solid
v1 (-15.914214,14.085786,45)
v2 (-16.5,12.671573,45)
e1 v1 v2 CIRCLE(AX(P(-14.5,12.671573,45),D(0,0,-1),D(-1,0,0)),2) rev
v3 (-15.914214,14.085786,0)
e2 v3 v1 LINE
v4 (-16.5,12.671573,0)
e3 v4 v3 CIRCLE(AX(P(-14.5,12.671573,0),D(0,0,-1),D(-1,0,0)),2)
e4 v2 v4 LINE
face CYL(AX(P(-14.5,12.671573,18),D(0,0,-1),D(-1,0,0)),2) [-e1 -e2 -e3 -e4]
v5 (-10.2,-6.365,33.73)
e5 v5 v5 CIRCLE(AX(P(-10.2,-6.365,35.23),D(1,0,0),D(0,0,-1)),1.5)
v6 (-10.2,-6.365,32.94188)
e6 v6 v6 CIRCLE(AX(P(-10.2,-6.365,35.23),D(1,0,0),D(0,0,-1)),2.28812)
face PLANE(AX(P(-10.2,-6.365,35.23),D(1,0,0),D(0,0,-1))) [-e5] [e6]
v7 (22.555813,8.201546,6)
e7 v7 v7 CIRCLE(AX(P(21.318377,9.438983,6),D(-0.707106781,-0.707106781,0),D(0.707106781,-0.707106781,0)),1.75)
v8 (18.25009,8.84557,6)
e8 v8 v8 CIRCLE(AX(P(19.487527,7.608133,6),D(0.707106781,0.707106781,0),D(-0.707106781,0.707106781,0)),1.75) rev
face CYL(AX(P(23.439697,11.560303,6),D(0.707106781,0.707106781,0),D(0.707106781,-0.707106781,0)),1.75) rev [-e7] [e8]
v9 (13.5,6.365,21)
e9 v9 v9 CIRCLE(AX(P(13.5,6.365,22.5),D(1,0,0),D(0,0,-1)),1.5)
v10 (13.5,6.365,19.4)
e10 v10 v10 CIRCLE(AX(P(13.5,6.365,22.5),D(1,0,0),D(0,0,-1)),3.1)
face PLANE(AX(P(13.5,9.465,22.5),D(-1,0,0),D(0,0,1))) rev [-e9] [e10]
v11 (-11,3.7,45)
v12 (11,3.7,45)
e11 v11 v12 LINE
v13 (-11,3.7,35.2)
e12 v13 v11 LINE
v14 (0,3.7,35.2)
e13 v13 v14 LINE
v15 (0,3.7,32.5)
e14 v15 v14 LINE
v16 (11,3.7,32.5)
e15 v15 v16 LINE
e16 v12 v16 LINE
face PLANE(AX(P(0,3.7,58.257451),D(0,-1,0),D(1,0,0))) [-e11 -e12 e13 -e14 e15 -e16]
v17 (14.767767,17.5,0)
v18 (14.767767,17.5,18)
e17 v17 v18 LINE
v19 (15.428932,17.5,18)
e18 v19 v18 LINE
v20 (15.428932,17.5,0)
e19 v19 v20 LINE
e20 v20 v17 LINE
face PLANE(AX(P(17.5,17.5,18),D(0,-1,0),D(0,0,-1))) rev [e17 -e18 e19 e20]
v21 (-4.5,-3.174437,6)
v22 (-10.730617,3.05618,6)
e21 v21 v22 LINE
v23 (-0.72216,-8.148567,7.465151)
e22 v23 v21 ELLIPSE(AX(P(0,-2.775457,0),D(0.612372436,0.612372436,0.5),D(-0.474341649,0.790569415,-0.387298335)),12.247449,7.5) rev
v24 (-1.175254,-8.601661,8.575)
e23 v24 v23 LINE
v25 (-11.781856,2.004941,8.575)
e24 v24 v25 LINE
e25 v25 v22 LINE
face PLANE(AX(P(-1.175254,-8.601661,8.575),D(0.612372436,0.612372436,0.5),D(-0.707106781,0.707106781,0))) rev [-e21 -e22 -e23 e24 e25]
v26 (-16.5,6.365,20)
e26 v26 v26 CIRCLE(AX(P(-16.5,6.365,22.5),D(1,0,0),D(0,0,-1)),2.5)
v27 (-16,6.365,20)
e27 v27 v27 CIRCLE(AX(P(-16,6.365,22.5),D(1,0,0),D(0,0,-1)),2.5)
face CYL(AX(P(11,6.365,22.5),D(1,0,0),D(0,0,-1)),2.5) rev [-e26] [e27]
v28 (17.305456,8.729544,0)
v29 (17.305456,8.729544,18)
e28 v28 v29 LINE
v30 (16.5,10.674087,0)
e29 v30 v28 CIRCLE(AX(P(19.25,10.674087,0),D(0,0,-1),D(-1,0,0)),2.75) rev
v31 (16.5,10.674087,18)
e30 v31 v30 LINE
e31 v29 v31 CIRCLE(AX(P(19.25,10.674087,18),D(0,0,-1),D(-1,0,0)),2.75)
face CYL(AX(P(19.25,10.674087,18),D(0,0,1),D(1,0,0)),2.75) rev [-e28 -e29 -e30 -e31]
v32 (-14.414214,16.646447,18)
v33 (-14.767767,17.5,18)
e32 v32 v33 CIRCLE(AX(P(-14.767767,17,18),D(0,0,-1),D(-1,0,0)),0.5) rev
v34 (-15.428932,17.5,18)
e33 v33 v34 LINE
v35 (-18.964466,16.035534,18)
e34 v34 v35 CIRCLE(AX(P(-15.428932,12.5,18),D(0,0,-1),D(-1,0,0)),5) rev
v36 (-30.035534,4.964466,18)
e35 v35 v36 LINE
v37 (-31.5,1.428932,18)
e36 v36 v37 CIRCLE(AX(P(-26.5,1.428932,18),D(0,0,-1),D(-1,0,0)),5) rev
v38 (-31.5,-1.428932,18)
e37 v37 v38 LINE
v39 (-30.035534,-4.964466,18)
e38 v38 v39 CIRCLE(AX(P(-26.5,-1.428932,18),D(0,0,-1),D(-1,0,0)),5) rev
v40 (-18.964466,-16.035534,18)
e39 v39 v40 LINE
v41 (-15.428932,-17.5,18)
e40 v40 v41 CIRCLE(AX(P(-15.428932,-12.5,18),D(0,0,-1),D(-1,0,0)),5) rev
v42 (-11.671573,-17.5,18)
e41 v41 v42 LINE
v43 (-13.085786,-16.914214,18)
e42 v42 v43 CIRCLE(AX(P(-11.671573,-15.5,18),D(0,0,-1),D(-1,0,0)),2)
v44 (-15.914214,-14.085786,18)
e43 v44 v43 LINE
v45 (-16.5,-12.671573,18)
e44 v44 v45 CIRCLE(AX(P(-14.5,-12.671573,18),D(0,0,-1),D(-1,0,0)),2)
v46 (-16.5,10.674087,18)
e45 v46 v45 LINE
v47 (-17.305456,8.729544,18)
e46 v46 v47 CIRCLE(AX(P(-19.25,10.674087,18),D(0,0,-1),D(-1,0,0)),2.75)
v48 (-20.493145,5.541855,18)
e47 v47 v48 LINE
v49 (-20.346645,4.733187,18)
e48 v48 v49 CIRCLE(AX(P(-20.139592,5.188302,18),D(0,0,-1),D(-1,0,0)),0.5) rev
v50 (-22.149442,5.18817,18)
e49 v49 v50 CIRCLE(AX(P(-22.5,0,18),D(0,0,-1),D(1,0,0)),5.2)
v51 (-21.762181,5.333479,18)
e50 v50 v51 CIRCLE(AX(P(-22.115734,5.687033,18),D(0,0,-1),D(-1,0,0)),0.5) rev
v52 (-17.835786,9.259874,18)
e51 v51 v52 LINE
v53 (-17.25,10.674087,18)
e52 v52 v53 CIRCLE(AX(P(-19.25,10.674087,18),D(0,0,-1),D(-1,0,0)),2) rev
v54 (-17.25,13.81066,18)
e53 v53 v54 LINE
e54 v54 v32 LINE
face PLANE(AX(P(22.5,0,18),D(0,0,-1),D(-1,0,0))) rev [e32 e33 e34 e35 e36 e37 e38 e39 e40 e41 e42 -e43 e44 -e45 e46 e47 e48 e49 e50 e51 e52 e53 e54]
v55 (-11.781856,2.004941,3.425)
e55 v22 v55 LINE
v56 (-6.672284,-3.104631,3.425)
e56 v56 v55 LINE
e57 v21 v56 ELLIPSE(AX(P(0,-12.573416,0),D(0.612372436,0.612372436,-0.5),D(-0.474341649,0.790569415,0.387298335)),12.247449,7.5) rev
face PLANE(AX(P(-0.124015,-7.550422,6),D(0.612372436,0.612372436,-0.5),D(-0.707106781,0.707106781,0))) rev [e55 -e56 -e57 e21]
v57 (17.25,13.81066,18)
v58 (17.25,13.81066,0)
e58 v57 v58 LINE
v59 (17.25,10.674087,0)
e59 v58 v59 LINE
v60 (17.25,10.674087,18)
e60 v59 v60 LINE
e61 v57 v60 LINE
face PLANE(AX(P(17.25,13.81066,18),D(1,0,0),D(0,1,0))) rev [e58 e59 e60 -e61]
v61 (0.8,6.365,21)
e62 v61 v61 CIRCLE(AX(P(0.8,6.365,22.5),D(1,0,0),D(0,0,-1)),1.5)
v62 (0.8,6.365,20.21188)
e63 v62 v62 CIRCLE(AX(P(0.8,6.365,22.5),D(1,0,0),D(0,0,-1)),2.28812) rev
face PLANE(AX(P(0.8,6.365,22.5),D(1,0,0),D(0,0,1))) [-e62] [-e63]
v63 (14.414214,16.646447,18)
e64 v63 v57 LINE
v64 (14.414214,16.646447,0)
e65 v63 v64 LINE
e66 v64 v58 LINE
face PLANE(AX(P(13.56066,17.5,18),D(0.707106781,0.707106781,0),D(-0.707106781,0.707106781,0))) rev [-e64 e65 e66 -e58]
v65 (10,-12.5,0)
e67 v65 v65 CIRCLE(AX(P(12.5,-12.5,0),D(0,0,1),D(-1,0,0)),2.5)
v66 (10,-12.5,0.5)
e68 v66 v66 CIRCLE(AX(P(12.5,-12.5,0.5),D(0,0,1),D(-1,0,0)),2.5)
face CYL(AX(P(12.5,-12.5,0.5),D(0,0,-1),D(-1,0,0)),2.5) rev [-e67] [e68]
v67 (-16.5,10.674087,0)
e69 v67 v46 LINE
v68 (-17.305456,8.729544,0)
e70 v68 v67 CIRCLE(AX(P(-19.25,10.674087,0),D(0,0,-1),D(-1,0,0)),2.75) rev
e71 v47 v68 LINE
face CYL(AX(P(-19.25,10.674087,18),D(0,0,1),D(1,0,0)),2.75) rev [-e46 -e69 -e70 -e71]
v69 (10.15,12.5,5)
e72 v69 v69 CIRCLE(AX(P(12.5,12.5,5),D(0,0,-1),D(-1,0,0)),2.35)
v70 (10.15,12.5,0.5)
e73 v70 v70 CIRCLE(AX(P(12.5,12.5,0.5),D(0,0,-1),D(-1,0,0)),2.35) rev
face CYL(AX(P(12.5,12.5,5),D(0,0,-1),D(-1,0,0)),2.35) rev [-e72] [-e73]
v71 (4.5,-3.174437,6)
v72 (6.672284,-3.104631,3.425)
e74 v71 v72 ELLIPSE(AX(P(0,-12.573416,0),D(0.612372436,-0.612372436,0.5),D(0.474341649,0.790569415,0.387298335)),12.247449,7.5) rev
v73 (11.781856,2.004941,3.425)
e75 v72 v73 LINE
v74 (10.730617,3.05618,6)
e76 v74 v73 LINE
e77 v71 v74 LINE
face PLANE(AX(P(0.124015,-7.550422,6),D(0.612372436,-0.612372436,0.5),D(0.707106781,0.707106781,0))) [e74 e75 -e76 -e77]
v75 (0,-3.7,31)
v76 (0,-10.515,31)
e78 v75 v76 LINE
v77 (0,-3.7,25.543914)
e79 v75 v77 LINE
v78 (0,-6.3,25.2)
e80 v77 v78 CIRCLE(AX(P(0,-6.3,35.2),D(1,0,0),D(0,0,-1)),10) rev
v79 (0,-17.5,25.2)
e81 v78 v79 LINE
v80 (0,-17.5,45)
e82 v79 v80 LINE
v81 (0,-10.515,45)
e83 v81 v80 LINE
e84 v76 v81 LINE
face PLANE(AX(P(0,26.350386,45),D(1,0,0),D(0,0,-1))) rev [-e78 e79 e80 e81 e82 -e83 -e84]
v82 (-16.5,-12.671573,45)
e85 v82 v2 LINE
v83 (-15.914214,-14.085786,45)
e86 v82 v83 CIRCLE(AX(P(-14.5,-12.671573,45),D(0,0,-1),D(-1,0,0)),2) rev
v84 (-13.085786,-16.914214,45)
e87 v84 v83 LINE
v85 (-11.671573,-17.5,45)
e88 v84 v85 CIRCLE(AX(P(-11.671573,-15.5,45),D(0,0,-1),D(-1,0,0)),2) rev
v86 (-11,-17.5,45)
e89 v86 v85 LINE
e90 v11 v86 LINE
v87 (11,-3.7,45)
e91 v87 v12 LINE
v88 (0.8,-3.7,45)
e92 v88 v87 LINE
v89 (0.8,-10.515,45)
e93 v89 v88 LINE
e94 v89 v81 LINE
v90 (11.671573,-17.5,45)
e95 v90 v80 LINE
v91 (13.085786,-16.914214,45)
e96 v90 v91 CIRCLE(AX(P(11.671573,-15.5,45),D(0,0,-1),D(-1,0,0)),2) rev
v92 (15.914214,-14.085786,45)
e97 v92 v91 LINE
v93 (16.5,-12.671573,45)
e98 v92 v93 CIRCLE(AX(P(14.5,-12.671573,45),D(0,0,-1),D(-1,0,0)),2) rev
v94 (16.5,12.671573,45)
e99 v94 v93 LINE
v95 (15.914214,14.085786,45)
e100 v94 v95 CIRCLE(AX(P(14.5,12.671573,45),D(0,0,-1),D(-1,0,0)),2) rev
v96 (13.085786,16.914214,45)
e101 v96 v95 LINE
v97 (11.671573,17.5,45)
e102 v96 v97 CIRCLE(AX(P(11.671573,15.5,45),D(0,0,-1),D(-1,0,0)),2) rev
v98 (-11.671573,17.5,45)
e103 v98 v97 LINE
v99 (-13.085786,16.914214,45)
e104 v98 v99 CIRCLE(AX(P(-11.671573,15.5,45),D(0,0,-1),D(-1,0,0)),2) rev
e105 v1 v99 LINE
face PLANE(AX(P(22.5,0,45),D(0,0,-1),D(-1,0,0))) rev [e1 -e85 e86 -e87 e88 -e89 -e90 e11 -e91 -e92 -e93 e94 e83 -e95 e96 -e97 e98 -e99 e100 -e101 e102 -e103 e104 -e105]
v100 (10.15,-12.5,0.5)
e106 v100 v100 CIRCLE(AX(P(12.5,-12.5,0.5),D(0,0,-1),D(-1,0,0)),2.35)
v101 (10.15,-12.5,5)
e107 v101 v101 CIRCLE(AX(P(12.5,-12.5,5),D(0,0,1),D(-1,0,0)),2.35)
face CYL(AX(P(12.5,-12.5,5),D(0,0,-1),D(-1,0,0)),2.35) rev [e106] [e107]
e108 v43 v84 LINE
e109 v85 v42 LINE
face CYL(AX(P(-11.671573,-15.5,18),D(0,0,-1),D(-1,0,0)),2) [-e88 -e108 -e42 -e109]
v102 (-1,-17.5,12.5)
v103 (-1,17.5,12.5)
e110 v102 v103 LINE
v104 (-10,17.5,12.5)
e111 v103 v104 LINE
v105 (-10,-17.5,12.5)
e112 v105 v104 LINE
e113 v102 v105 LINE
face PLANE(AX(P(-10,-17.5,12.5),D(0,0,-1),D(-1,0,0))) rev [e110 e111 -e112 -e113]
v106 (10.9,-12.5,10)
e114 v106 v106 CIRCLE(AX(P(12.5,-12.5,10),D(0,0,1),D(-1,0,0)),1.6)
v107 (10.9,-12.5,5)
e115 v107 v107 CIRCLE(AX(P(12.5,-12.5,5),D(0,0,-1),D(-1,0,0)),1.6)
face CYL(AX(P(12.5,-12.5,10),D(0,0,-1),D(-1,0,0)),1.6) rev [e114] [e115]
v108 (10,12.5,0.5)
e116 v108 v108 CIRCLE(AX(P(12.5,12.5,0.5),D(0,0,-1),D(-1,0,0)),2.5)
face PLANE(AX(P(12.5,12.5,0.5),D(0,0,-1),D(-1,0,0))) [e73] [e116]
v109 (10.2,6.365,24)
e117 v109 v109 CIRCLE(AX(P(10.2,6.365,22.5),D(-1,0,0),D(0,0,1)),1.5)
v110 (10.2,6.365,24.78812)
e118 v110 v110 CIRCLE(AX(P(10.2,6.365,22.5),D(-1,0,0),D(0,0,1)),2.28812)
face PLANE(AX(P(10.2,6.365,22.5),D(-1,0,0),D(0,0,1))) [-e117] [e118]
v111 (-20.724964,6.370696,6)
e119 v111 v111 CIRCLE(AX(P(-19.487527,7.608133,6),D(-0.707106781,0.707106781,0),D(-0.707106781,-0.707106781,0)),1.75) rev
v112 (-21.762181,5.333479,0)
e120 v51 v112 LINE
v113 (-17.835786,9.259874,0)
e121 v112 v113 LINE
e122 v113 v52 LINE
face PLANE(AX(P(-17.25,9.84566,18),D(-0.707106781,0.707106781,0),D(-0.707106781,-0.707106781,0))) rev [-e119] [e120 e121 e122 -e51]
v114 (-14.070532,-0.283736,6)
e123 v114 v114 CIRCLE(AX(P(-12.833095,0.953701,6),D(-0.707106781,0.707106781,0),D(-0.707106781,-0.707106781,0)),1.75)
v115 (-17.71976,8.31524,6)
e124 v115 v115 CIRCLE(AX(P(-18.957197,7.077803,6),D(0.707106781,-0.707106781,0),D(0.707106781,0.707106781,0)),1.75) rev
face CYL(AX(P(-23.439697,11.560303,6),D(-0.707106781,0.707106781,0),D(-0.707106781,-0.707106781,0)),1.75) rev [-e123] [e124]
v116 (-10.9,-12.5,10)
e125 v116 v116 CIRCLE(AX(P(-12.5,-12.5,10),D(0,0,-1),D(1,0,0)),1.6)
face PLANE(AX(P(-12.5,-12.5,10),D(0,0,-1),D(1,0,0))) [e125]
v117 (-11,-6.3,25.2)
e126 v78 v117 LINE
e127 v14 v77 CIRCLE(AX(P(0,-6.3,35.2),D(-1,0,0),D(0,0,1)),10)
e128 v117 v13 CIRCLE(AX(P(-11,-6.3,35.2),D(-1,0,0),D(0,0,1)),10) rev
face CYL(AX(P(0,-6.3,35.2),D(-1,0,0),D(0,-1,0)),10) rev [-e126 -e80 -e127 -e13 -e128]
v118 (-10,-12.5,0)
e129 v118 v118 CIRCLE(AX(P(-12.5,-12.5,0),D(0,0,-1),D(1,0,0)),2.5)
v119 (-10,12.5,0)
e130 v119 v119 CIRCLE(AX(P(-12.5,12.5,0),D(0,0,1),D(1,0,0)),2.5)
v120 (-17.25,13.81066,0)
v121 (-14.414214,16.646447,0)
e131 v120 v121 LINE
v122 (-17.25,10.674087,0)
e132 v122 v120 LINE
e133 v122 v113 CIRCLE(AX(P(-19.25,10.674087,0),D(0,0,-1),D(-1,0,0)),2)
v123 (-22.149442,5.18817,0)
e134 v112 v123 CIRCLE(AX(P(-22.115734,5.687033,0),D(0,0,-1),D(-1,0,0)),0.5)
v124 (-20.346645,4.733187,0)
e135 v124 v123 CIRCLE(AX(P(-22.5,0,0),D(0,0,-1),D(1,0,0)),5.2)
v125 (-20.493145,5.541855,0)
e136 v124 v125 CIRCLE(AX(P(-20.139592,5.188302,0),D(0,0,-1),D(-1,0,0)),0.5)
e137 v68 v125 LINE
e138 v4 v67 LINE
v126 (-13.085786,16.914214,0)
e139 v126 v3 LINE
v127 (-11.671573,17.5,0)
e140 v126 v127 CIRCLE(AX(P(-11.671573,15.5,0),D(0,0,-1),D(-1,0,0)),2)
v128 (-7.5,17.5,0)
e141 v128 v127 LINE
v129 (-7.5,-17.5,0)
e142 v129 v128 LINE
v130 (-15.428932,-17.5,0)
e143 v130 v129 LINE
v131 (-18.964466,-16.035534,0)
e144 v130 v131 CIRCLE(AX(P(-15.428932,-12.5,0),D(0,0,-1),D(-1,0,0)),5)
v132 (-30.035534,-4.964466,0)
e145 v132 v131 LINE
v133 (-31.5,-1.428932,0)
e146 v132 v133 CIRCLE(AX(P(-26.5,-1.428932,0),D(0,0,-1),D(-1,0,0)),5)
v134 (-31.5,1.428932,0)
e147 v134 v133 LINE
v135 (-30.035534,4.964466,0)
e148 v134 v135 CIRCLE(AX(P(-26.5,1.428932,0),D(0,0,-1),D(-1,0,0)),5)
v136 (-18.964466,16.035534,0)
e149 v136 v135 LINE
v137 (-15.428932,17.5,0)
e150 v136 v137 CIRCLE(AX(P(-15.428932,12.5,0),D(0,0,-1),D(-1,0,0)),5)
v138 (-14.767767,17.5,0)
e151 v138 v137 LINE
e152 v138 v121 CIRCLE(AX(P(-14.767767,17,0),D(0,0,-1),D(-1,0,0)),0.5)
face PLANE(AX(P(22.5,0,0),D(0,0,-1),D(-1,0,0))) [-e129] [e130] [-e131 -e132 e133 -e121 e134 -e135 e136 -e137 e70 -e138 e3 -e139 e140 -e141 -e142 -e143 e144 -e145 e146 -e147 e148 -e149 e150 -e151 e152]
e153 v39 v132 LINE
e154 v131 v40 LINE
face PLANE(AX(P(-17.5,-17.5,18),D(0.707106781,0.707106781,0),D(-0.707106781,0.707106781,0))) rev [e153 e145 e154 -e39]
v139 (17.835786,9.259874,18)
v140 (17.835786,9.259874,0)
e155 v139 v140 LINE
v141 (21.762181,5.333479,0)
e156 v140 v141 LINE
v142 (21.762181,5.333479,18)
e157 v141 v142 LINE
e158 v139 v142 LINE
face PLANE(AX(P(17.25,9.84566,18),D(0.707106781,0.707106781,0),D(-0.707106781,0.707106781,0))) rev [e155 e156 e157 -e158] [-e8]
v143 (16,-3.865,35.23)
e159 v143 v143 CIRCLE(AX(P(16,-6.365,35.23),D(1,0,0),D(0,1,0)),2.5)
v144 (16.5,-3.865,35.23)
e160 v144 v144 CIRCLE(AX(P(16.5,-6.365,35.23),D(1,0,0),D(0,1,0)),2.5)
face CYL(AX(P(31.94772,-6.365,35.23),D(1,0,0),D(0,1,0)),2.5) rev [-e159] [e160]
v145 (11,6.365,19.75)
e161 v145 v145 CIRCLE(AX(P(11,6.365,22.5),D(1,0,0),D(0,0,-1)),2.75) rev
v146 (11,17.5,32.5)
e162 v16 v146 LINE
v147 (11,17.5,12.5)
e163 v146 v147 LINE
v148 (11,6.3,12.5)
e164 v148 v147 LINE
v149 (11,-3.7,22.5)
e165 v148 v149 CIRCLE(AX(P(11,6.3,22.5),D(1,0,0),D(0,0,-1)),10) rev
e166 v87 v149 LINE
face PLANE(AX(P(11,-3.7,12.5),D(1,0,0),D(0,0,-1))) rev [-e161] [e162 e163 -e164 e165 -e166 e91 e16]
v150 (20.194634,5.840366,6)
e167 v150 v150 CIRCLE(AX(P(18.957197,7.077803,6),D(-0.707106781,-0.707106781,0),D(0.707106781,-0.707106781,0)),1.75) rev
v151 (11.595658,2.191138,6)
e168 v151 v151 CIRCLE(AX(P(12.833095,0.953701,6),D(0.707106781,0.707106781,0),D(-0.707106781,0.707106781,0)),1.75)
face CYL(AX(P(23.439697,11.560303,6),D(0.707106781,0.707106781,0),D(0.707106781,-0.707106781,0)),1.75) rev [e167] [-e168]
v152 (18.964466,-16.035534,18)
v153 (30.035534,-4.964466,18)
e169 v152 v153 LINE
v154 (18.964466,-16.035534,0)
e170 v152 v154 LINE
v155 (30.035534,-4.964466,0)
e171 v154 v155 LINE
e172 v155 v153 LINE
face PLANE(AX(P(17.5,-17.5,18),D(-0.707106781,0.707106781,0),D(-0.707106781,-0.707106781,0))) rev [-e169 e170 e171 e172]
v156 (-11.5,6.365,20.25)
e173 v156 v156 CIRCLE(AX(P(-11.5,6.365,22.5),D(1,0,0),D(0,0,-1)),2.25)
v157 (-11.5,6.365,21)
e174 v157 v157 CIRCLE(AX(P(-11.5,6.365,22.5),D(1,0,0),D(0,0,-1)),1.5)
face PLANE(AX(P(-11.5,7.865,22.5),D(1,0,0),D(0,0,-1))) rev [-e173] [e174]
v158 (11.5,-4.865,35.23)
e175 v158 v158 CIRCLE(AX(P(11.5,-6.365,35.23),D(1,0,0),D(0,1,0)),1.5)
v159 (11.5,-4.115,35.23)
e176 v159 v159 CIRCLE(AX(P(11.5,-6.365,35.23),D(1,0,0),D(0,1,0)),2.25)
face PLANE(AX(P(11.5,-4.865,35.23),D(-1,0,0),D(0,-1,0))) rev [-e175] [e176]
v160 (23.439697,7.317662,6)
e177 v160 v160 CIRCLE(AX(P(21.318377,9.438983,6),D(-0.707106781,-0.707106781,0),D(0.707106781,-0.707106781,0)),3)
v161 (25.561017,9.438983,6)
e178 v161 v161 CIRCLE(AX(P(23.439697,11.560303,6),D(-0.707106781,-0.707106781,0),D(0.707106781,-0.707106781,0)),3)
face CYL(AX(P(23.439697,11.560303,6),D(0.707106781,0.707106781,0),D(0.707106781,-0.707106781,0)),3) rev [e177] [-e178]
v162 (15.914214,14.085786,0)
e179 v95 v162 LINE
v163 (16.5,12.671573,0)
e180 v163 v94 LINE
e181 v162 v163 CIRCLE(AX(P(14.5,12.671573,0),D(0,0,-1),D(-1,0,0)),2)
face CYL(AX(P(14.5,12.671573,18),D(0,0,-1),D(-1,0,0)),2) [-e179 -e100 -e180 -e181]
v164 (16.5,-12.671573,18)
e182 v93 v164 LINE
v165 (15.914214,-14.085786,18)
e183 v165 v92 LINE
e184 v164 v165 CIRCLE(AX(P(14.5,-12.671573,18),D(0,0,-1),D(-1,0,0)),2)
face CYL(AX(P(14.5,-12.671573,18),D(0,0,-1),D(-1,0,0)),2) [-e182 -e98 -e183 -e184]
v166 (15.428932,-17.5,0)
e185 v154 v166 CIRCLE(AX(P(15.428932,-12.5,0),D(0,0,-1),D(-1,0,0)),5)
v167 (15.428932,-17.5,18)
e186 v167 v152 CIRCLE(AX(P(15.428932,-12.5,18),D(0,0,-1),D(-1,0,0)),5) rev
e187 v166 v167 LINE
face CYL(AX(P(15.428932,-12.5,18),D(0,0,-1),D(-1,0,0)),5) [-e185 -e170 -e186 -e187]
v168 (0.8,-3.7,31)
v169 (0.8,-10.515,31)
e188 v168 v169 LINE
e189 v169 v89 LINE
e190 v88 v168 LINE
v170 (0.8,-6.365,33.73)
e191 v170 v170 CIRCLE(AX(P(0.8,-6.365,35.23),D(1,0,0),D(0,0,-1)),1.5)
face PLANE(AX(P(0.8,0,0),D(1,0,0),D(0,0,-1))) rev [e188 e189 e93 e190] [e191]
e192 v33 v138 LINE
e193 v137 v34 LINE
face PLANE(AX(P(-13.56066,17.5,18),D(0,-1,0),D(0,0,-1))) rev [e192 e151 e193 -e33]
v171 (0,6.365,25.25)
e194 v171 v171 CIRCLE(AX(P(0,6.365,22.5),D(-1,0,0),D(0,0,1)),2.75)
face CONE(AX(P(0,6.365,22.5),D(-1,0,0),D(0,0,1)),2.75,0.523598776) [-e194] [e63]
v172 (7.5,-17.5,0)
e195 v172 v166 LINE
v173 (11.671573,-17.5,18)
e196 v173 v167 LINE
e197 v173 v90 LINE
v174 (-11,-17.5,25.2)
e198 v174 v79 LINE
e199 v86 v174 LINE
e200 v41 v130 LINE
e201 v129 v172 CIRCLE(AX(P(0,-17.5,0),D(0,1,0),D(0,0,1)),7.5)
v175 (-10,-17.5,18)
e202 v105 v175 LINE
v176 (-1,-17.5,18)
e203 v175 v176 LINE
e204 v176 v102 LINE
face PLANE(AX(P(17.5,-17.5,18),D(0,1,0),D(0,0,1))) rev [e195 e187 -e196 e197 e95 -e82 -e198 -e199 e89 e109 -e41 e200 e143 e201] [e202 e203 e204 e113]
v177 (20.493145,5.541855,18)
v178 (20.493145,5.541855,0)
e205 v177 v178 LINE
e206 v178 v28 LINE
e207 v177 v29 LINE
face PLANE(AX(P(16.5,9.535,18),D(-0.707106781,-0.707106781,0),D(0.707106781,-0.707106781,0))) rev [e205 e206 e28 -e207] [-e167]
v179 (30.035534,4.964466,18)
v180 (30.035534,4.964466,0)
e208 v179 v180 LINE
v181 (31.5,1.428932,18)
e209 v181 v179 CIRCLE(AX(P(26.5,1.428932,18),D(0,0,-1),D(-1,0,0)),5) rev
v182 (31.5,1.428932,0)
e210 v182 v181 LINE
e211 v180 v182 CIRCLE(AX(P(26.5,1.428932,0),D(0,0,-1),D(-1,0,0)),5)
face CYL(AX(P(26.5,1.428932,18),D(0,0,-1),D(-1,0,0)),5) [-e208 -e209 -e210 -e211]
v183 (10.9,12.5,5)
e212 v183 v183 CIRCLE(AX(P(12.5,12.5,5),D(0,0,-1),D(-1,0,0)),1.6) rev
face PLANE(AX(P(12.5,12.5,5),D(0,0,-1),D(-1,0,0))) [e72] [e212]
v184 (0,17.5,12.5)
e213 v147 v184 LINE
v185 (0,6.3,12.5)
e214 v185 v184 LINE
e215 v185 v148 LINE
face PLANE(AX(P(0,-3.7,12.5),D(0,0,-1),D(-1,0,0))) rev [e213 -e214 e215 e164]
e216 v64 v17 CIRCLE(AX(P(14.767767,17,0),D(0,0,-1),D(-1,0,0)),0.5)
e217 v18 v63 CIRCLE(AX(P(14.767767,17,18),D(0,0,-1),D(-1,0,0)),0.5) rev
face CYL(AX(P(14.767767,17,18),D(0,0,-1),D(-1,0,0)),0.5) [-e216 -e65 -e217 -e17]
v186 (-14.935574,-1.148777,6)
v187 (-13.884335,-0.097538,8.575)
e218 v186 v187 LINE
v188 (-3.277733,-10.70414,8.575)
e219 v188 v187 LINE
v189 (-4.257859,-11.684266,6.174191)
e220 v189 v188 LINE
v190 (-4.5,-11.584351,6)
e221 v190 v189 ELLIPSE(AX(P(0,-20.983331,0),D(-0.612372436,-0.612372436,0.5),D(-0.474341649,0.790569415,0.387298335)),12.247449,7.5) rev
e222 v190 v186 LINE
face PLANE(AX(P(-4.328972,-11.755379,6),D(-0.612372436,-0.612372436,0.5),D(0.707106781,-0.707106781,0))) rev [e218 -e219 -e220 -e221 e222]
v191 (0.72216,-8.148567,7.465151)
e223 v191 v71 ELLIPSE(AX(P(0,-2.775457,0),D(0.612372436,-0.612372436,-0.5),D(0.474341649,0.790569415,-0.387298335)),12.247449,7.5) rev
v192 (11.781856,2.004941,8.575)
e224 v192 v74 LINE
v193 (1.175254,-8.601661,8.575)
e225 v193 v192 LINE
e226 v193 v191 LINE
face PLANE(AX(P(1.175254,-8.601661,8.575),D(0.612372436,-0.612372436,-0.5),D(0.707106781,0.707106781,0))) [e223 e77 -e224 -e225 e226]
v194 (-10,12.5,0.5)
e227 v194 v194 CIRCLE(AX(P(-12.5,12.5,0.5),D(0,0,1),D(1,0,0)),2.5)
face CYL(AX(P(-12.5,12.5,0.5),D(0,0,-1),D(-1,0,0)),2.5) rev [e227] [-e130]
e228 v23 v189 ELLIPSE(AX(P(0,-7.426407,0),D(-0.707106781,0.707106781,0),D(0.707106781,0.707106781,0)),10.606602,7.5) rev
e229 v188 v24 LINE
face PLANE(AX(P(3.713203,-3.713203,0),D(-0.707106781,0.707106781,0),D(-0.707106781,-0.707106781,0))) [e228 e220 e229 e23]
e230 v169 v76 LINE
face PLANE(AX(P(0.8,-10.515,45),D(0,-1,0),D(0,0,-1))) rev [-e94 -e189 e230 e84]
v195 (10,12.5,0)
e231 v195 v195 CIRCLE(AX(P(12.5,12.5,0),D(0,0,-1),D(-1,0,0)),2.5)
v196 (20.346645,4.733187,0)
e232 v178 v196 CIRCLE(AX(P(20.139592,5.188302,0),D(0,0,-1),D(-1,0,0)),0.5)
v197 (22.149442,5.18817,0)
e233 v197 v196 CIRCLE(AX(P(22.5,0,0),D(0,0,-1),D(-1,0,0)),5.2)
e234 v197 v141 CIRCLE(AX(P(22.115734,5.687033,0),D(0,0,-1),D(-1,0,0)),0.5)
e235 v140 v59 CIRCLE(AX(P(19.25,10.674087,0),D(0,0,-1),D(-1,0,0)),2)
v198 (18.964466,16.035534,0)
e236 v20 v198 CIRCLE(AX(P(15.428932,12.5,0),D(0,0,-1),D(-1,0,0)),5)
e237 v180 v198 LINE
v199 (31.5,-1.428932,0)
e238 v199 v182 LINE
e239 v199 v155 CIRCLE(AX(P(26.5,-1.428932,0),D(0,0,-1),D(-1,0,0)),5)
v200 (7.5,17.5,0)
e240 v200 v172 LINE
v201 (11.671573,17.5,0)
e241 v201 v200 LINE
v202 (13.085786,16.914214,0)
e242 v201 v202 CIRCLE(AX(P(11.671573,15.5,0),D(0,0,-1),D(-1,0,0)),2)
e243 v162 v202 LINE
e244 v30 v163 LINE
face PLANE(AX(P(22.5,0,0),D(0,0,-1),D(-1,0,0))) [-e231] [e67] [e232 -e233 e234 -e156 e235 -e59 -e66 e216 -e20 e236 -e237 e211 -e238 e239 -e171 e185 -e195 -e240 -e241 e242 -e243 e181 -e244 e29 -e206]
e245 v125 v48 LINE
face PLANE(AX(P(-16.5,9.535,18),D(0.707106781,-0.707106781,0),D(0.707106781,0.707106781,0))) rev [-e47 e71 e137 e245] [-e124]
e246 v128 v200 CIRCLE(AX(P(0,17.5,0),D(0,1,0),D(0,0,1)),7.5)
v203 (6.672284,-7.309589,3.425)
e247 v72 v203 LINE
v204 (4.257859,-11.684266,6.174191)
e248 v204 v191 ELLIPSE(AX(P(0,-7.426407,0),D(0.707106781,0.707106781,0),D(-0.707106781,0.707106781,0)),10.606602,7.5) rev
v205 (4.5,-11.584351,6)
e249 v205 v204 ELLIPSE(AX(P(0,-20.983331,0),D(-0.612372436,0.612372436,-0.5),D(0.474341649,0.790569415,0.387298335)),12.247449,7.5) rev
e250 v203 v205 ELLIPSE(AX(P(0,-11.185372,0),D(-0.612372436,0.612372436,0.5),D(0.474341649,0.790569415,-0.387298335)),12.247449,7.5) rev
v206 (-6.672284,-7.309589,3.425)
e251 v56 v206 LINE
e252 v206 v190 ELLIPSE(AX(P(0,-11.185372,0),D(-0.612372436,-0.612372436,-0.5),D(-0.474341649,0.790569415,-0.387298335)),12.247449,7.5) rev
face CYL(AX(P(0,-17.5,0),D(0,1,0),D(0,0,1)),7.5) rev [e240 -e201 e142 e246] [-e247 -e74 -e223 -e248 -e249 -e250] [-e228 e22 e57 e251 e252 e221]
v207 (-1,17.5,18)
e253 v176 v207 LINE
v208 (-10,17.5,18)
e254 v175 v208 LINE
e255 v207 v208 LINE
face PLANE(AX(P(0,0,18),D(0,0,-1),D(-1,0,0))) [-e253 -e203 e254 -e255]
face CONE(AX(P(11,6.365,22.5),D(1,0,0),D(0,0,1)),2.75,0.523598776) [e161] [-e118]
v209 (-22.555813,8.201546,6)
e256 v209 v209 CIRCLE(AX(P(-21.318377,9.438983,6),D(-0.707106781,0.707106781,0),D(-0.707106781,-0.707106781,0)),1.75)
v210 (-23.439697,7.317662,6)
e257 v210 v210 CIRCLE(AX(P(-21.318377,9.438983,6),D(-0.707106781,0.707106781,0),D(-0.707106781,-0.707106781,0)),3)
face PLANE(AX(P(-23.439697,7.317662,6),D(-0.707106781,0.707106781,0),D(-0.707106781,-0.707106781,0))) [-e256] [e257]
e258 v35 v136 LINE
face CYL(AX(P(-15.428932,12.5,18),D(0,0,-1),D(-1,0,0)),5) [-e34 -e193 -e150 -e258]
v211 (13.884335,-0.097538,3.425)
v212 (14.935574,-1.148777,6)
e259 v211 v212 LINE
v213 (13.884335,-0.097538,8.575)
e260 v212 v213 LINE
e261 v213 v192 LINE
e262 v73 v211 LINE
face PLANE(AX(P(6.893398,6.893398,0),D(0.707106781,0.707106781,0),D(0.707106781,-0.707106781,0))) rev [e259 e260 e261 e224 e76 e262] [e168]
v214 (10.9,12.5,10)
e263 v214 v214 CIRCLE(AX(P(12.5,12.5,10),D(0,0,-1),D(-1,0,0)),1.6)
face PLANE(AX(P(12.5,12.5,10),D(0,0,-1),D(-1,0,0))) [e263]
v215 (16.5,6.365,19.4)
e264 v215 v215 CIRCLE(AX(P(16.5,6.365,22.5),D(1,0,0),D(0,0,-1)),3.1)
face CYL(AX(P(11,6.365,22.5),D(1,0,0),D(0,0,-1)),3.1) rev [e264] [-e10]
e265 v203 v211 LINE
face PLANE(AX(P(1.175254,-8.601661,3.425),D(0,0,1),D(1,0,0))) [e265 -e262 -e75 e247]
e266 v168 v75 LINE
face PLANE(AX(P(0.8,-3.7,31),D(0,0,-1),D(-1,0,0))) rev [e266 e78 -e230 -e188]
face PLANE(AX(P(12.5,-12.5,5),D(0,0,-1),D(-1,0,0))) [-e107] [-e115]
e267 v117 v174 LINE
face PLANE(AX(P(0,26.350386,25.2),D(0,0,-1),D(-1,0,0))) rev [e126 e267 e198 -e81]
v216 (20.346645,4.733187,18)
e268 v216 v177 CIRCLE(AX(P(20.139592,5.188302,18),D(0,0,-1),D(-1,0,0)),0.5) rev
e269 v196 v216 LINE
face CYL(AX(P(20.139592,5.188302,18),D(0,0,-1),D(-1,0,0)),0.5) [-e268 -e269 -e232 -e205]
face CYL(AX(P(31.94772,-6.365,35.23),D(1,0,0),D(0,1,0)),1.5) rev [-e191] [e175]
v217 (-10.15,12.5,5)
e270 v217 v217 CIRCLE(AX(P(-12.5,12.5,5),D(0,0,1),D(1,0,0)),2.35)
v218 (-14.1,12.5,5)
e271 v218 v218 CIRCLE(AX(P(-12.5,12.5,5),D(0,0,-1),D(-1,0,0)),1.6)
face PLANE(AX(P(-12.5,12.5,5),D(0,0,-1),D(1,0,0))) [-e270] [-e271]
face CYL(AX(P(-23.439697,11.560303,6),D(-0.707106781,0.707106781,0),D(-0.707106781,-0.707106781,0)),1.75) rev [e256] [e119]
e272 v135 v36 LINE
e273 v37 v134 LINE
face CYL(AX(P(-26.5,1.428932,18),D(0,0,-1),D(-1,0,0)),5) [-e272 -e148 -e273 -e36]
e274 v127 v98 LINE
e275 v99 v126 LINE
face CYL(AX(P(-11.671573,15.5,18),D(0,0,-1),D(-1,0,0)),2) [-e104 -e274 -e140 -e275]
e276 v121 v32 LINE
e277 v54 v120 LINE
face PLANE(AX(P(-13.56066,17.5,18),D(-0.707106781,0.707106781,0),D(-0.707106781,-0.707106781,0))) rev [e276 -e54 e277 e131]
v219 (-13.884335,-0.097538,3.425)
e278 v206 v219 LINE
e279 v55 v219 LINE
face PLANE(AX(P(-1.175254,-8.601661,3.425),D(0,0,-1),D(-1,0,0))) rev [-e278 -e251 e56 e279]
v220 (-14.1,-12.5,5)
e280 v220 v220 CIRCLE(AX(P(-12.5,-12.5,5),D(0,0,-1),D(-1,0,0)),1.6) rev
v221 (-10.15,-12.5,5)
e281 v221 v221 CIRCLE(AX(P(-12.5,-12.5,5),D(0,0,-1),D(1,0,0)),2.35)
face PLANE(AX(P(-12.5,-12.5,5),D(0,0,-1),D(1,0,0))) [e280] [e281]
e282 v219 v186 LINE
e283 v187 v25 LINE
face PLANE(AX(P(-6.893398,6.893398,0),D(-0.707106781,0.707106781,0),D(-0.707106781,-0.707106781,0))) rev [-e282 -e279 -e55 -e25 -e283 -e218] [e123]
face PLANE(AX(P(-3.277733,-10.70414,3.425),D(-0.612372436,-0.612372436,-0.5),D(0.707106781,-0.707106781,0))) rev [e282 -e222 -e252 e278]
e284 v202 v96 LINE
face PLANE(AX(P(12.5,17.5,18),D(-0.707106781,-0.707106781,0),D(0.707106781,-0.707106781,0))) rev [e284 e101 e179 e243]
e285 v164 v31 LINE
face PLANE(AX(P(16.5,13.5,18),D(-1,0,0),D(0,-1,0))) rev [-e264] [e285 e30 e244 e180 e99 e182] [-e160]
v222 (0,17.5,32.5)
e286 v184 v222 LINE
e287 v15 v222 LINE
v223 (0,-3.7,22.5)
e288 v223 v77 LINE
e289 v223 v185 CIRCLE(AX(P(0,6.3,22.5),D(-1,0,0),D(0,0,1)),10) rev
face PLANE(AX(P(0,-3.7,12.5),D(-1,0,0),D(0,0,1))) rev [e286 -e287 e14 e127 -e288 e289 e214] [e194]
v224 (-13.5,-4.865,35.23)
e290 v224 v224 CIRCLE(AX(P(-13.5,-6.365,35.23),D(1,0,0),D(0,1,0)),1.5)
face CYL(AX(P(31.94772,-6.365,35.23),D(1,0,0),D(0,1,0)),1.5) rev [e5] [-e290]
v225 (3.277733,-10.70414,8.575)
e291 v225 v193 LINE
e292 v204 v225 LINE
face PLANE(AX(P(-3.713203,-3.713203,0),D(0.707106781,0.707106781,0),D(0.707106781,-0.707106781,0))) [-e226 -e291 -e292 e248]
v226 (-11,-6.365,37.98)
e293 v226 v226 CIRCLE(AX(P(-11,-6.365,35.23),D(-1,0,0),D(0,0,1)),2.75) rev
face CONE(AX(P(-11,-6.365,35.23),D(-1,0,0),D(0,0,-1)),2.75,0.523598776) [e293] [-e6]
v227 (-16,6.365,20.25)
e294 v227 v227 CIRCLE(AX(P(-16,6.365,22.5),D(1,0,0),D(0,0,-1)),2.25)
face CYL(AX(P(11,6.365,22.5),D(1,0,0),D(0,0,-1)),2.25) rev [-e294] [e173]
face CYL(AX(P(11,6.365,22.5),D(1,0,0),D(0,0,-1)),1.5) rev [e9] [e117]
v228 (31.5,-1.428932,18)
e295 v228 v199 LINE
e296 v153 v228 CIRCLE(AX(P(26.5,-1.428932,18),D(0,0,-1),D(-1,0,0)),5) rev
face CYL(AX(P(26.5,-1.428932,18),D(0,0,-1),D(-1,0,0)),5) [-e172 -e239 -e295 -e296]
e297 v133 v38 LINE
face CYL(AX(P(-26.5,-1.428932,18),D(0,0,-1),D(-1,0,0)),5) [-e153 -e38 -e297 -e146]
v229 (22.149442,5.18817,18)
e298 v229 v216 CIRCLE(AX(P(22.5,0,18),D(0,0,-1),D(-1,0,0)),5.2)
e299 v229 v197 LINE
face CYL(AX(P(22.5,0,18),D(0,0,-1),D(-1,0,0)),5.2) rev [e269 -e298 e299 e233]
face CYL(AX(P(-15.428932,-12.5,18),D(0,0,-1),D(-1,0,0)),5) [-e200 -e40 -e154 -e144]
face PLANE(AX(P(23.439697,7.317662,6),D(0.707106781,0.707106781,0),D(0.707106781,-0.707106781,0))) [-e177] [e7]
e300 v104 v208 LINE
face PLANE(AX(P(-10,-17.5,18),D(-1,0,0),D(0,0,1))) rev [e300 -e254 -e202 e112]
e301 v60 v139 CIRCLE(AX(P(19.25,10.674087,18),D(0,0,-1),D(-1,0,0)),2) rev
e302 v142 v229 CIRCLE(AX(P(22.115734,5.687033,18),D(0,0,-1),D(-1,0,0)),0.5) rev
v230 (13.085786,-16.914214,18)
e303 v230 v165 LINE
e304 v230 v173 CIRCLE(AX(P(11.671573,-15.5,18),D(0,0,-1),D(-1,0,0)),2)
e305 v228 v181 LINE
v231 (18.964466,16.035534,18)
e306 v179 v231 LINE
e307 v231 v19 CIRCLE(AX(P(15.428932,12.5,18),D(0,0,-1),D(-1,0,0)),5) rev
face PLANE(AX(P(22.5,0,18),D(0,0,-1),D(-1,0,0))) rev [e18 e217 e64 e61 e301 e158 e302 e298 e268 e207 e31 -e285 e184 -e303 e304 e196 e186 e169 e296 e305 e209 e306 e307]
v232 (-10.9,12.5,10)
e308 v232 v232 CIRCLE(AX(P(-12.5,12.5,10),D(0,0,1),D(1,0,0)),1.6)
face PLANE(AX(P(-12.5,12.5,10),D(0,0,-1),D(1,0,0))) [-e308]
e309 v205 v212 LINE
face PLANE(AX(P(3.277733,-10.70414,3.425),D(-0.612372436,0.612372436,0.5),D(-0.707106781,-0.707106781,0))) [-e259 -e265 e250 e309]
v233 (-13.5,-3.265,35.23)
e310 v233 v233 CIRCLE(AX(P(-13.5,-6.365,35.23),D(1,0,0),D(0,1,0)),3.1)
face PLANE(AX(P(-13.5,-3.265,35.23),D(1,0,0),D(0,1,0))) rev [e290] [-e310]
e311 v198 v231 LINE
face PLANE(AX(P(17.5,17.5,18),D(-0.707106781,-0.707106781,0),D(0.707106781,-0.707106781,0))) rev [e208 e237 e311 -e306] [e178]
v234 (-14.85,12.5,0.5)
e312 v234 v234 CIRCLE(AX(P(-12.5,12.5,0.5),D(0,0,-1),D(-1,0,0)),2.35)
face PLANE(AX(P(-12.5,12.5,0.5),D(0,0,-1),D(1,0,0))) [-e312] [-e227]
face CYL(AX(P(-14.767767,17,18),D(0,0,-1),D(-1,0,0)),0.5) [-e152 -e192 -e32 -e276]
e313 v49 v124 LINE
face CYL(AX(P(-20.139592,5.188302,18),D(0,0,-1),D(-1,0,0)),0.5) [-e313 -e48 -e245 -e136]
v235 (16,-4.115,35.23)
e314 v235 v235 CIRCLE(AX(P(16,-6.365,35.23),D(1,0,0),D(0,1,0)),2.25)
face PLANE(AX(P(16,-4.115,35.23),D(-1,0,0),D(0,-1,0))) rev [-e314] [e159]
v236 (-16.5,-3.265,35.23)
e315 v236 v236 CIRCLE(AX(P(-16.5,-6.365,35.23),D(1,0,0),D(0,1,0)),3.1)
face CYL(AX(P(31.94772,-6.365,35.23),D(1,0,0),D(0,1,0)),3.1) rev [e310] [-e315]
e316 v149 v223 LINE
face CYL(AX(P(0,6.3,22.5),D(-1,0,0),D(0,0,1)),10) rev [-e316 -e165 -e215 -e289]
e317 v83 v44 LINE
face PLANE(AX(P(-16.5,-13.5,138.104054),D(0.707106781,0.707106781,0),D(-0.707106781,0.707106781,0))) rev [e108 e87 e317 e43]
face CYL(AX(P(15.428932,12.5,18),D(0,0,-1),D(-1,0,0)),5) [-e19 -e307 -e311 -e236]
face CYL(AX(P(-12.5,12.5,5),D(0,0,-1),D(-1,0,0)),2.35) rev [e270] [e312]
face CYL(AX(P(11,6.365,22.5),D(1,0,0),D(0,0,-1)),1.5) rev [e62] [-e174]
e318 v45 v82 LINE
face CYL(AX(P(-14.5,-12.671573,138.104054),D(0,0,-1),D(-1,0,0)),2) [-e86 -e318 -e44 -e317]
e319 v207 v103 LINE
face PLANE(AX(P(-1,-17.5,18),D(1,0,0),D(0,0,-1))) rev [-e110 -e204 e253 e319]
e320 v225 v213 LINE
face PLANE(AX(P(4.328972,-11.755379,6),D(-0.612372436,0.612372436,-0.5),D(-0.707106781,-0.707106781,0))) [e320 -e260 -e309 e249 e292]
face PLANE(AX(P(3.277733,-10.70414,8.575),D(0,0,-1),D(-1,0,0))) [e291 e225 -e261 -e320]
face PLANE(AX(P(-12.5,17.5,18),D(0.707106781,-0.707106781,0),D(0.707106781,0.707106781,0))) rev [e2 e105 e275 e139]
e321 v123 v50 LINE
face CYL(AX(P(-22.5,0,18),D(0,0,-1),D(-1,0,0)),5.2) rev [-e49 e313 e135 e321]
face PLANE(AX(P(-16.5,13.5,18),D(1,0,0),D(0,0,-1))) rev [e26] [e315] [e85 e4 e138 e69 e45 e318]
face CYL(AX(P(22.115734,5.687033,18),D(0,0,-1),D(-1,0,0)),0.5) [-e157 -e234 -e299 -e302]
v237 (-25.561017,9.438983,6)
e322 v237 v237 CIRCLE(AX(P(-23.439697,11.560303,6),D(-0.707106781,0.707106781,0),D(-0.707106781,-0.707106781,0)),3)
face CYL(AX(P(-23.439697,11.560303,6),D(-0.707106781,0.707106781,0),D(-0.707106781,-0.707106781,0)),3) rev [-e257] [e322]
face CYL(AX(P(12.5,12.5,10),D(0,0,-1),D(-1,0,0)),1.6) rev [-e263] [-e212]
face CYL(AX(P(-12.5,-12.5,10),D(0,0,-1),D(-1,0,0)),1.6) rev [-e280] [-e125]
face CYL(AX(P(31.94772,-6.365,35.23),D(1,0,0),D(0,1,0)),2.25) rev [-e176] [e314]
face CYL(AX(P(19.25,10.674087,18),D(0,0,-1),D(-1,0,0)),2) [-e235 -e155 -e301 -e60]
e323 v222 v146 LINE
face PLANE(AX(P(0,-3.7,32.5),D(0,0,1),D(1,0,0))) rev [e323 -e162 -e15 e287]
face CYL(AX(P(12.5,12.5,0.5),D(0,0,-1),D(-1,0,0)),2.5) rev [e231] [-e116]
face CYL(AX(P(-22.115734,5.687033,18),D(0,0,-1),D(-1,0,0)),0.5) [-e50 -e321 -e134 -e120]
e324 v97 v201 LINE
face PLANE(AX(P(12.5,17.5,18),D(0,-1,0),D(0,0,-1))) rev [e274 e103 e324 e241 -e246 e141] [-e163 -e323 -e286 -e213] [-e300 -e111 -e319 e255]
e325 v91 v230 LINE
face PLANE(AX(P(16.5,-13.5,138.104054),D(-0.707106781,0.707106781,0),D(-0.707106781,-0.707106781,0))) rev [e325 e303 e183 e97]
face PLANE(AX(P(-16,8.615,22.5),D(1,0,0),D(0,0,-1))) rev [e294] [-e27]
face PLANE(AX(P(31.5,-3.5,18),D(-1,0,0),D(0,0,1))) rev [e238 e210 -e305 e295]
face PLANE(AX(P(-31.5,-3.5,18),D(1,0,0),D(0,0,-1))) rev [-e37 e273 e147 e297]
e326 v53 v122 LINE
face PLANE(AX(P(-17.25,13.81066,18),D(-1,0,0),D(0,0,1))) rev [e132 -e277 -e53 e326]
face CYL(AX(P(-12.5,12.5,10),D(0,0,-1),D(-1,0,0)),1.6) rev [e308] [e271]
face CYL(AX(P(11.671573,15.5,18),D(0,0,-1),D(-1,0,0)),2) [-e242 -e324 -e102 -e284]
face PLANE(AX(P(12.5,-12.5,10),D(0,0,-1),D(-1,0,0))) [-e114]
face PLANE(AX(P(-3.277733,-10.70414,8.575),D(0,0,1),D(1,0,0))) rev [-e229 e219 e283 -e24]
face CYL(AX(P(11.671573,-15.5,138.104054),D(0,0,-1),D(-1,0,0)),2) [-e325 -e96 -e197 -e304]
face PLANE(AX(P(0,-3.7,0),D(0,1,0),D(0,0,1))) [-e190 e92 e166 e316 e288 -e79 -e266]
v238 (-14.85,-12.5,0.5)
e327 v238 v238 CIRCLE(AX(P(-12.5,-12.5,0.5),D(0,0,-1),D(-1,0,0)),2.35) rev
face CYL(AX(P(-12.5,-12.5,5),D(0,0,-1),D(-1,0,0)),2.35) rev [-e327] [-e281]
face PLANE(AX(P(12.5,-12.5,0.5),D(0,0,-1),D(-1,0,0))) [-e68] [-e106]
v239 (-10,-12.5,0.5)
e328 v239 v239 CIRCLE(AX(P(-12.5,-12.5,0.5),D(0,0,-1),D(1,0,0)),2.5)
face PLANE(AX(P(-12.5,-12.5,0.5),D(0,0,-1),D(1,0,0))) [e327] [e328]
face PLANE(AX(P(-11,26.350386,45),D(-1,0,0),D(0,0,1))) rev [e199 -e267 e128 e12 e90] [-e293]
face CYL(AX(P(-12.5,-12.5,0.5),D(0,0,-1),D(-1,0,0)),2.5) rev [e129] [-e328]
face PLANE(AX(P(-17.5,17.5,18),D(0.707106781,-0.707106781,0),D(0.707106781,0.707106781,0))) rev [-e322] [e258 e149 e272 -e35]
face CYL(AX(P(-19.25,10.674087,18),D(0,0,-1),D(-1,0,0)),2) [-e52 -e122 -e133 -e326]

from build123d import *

# Parameters (mm, degrees)
BOSS_EXTRUDE1_DEPTH     = 18
SKETCH2_R               = 7.5
SKETCH2_W               = 9
SKETCH2_H               = 5.5
CUT_EXTRUDE1_DEPTH      = 51.410812332
FILLET1_R               = 5
FILLET2_R               = 0.5
FILLET3_R               = 2
FILLET4_R               = 2.75
CUT_EXTRUDE2_DEPTH      = 15
SKETCH7_R               = 1.6
CUT_EXTRUDE3_DEPTH      = 10
SKETCH8_R               = 2.35
CUT_EXTRUDE4_DEPTH      = 5
SKETCH9_R               = 2.5
CUT_EXTRUDE5_DEPTH      = 0.5
MIRROR3_COPY_1_SKETCH_R = 1.6
MIRROR3_COPY_1_DEPTH    = 10
MIRROR3_COPY_2_SKETCH_R = 2.35
MIRROR3_COPY_2_DEPTH    = 5
MIRROR3_COPY_3_SKETCH_R = 2.5
MIRROR3_COPY_3_DEPTH    = 0.5
BOSS_EXTRUDE2_DEPTH     = 27
SKETCH11_W              = 11
SKETCH11_H              = 20
CUT_EXTRUDE6_DEPTH      = 21.2
SKETCH12_W              = 11
SKETCH12_H              = 3.7
CUT_EXTRUDE7_DEPTH      = 12.5
FILLET5_R               = 10
CUT_EXTRUDE8_REACH      = 67.133
SKETCH13_W              = 11
SKETCH13_H              = 19.8
FILLET6_R               = 10
SKETCH14_W              = 11
SKETCH14_H              = 7.4
CUT_EXTRUDE9_DEPTH      = 12.5
SKETCH15_R              = 2.75
BOSS_EXTRUDE3_DEPTH     = 0.8
BOSS_EXTRUDE3_TAPER     = 30
SKETCH16_W              = 14
SKETCH16_H              = 6.815
CUT_EXTRUDE10_DEPTH     = 0.8
SKETCH19_R              = 2.75
BOSS_EXTRUDE4_DEPTH     = 0.8
BOSS_EXTRUDE4_TAPER     = 30
FILLET7_R               = 2


with BuildPart() as part:
    # Sketch1 → Boss-Extrude1 (new body)
    with BuildSketch(Plane.XY):
        with BuildLine():
            Line((-17.5, 17.5), (-31.5, 3.5))
            Line((-31.5, 3.5), (-31.5, -3.5))
            Line((-31.5, -3.5), (-17.5, -17.5))
            Line((-17.5, -17.5), (17.5, -17.5))
            Line((17.5, -17.5), (31.5, -3.5))
            Line((31.5, -3.5), (31.5, 3.5))
            Line((31.5, 3.5), (17.5, 17.5))
            Line((17.5, 17.5), (13.560660172, 17.5))
            Line((13.560660172, 17.5), (17.25, 13.810660172))
            Line((17.25, 13.810660172), (17.25, 9.845660172))
            Line((17.25, 9.845660172), (21.927294091, 5.168366081))
            ThreePointArc((21.927294091, 5.168366081), (23.518574248, -5.09926529), (21.043225857, 4.991774143))
            Line((21.043225857, 4.991774143), (16.5, 9.535))
            Line((16.5, 9.535), (16.5, 13.5))
            Line((16.5, 13.5), (12.5, 17.5))
            Line((12.5, 17.5), (-12.5, 17.5))
            Line((-12.5, 17.5), (-16.5, 13.5))
            Line((-16.5, 13.5), (-16.5, 9.535))
            Line((-16.5, 9.535), (-21.043225857, 4.991774143))
            ThreePointArc((-21.043225857, 4.991774143), (-23.518574248, -5.09926529), (-21.927294091, 5.168366081))
            Line((-21.927294091, 5.168366081), (-17.25, 9.845660172))
            Line((-17.25, 9.845660172), (-17.25, 13.810660172))
            Line((-17.25, 13.810660172), (-13.560660172, 17.5))
            Line((-13.560660172, 17.5), (-17.5, 17.5))
        make_face()
    extrude(amount=BOSS_EXTRUDE1_DEPTH)

    # Sketch2 → Cut-Extrude1 (cut, through all)
    with BuildSketch(Plane(origin=(0, 17.5, 0), x_dir=(1, 0, 0), z_dir=(0, 1, 0))):
        Circle(SKETCH2_R)
        with Locations((-5.5, -15.25)):
            Rectangle(SKETCH2_W, SKETCH2_H)
    extrude(amount=-CUT_EXTRUDE1_DEPTH, mode=Mode.SUBTRACT)

    # Fillet1
    fillet1_edges = [part.edges().sort_by_distance(p)[0] for p in [
        (17.5, 17.5, 9),
        (31.5, 3.5, 9),
        (31.5, -3.5, 9),
        (17.5, -17.5, 9),
        (-17.5, -17.5, 9),
        (-31.5, -3.5, 9),
        (-31.5, 3.5, 9),
        (-17.5, 17.5, 9),
    ]]
    fillet(fillet1_edges, radius=FILLET1_R)

    # Fillet2
    fillet2_edges = [part.edges().sort_by_distance(p)[0] for p in [
        (-13.560660172, 17.5, 9),
        (-21.927294091, 5.168366081, 9),
        (-21.043225857, 4.991774143, 9),
        (21.043225857, 4.991774143, 9),
        (21.927294091, 5.168366081, 9),
        (13.560660172, 17.5, 9),
    ]]
    fillet(fillet2_edges, radius=FILLET2_R)

    # Fillet3
    fillet3_edges = [part.edges().sort_by_distance(p)[0] for p in [
        (-17.25, 9.845660172, 9),
        (17.25, 9.845660172, 9),
    ]]
    fillet(fillet3_edges, radius=FILLET3_R)

    # Fillet4
    fillet4_edges = [part.edges().sort_by_distance(p)[0] for p in [
        (-16.5, 9.535, 9),
        (16.5, 9.535, 9),
    ]]
    fillet(fillet4_edges, radius=FILLET4_R)

    # Sketch4 → Cut-Revolve1 (revolve, cut)
    with BuildSketch(Plane(origin=(0, 0, 6), x_dir=(-1, 0, 0), z_dir=(0, 0, -1))):
        Polygon((23.439696962, 11.560303038), (25.561017306, 9.438982694), (23.439696962, 7.317662351), (22.555813485, 8.201545827), (14.070532111, -0.283735547), (12.833095244, 0.95370132), align=None)
    cut_revolve1 = revolve(axis=Axis((-23.439696962, 11.560303038, 6), (0.7071067811865471, -0.707106781186548, 0)), mode=Mode.SUBTRACT)

    # Sketch6 → Cut-Extrude2 (cut)
    with BuildSketch(Plane(origin=(-6.893398282, 6.893398282, 0), x_dir=(0, 0, 1), z_dir=(-0.7071067811865471, 0.707106781186548, 0))):
        Polygon((3.425, -9.886676943), (6, -11.373353886), (8.575, -9.886676943), (8.575, -6.913323057), (6, -5.426646114), (3.425, -6.913323057), align=None)
    cut_extrude2 = extrude(amount=-CUT_EXTRUDE2_DEPTH, mode=Mode.SUBTRACT)

    # Mirror1: Cut-Revolve1, Cut-Extrude2 across plane
    add(cut_revolve1.mirror(Plane(origin=(0, 0, 0), x_dir=(0, 0, 1), z_dir=(1, 0, 0))), mode=Mode.SUBTRACT)
    add(cut_extrude2.mirror(Plane(origin=(0, 0, 0), x_dir=(0, 0, 1), z_dir=(1, 0, 0))), mode=Mode.SUBTRACT)

    # Sketch7 → Cut-Extrude3 (cut)
    with BuildSketch(Plane(origin=(0, 0, 0), x_dir=(-1, 0, 0), z_dir=(0, 0, -1))):
        with Locations((-12.5, 12.5)):
            Circle(SKETCH7_R)
    cut_extrude3 = extrude(amount=-CUT_EXTRUDE3_DEPTH, mode=Mode.SUBTRACT)

    # Sketch8 → Cut-Extrude4 (cut)
    with BuildSketch(Plane(origin=(0, 0, 0), x_dir=(-1, 0, 0), z_dir=(0, 0, -1))):
        with Locations((-12.5, 12.5)):
            Circle(SKETCH8_R)
    cut_extrude4 = extrude(amount=-CUT_EXTRUDE4_DEPTH, mode=Mode.SUBTRACT)

    # Sketch9 → Cut-Extrude5 (cut)
    with BuildSketch(Plane(origin=(0, 0, 0), x_dir=(-1, 0, 0), z_dir=(0, 0, -1))):
        with Locations((-12.5, 12.5)):
            Circle(SKETCH9_R)
    cut_extrude5 = extrude(amount=-CUT_EXTRUDE5_DEPTH, mode=Mode.SUBTRACT)

    # Mirror2: Cut-Extrude3, Cut-Extrude4, Cut-Extrude5 across plane
    add(cut_extrude3.mirror(Plane.ZX), mode=Mode.SUBTRACT)
    add(cut_extrude4.mirror(Plane.ZX), mode=Mode.SUBTRACT)
    add(cut_extrude5.mirror(Plane.ZX), mode=Mode.SUBTRACT)

    # Mirror3: Cut-Extrude3, Cut-Extrude4, Cut-Extrude5 across plane
    add(cut_extrude3.mirror(Plane(origin=(0, 0, 0), x_dir=(0, 0, 1), z_dir=(1, 0, 0))), mode=Mode.SUBTRACT)
    add(cut_extrude4.mirror(Plane(origin=(0, 0, 0), x_dir=(0, 0, 1), z_dir=(1, 0, 0))), mode=Mode.SUBTRACT)
    add(cut_extrude5.mirror(Plane(origin=(0, 0, 0), x_dir=(0, 0, 1), z_dir=(1, 0, 0))), mode=Mode.SUBTRACT)

    # Mirror3 copy 1 sketch → Mirror3 copy 1 (cut)
    with BuildSketch(Plane(origin=(0, 0, 0), x_dir=(1, 0, 0), z_dir=(0, 0, -1))):
        with Locations((-12.5, 12.5)):
            Circle(MIRROR3_COPY_1_SKETCH_R)
    extrude(amount=-MIRROR3_COPY_1_DEPTH, mode=Mode.SUBTRACT)

    # Mirror3 copy 2 sketch → Mirror3 copy 2 (cut)
    with BuildSketch(Plane(origin=(0, 0, 0), x_dir=(1, 0, 0), z_dir=(0, 0, -1))):
        with Locations((-12.5, 12.5)):
            Circle(MIRROR3_COPY_2_SKETCH_R)
    extrude(amount=-MIRROR3_COPY_2_DEPTH, mode=Mode.SUBTRACT)

    # Mirror3 copy 3 sketch → Mirror3 copy 3 (cut)
    with BuildSketch(Plane(origin=(0, 0, 0), x_dir=(1, 0, 0), z_dir=(0, 0, -1))):
        with Locations((-12.5, 12.5)):
            Circle(MIRROR3_COPY_3_SKETCH_R)
    extrude(amount=-MIRROR3_COPY_3_DEPTH, mode=Mode.SUBTRACT)

    # Sketch10 → Boss-Extrude2 (add)
    with BuildSketch(Plane.XY.offset(18)):
        Polygon((12.5, 17.5), (-12.5, 17.5), (-16.5, 13.5), (-16.5, -13.5), (-12.5, -17.5), (12.5, -17.5), (16.5, -13.5), (16.5, 13.5), align=None)
    extrude(amount=BOSS_EXTRUDE2_DEPTH)

    # Sketch11 → Cut-Extrude6 (cut)
    with BuildSketch(Plane(origin=(0, 17.5, 0), x_dir=(1, 0, 0), z_dir=(0, 1, 0))):
        with Locations((5.5, -22.5)):
            Rectangle(SKETCH11_W, SKETCH11_H)
    extrude(amount=-CUT_EXTRUDE6_DEPTH, mode=Mode.SUBTRACT)

    # Sketch12 → Cut-Extrude7 (cut)
    with BuildSketch(Plane(origin=(0, 0, 32.5), x_dir=(-1, 0, 0), z_dir=(0, 0, -1))):
        with Locations((-5.5, 1.85)):
            Rectangle(SKETCH12_W, SKETCH12_H)
        Polygon((-11, -3.7), (0, -3.7), (0, -3.591245546), (0, 0), (-11, 0), align=None)
    extrude(amount=-CUT_EXTRUDE7_DEPTH, mode=Mode.SUBTRACT)

    # Fillet5
    fillet5_edges = [part.edges().sort_by_distance(p)[0] for p in [
        (5.5, -3.7, 12.5),
    ]]
    fillet(fillet5_edges, radius=FILLET5_R)

    # Cut-Extrude8: up to this face of the body (flat: up to its plane)
    cut_extrude8_end = Plane(part.part.faces().sort_by_distance((5.5, 3.7, 38.75))[0])
    # Sketch13 → Cut-Extrude8 (cut, up to the picked face)
    with BuildSketch(Plane.XZ.offset(17.5), mode=Mode.PRIVATE) as cut_extrude8_sk1:
        with Locations((-5.5, 35.1)):
            Rectangle(SKETCH13_W, SKETCH13_H)
    cut_extrude8_tool1 = split(extrude(cut_extrude8_sk1.sketch, amount=-CUT_EXTRUDE8_REACH, mode=Mode.PRIVATE), bisect_by=cut_extrude8_end, keep=Keep.BOTH, mode=Mode.PRIVATE)
    add(cut_extrude8_tool1.solids().sort_by(Axis((-5.5, -17.5, 35.1), (0, 1, 0)))[0], mode=Mode.SUBTRACT)

    # Fillet6
    # the kernel refuses this fillet: 10 mm, written as the material it adds along each edge
    with BuildSketch(Plane(origin=(25, 3.7, 25.2), x_dir=(0, 0, 1), z_dir=(-1, 0, 0))) as fillet6_piece_1_section:
        with BuildLine():
            CenterArc((FILLET6_R, -FILLET6_R), FILLET6_R, 90, 90)
            Line((0, -FILLET6_R), (0, 0))
            Line((0, 0), (FILLET6_R, 0))
        make_face()
    fillet6_piece_1 = extrude(amount=36, mode=Mode.PRIVATE)
    fillet6_piece_1 = split(fillet6_piece_1, bisect_by=Plane(origin=(5.5, 3.588944861, 32.5), z_dir=(0, 0, 1)), keep=Keep.TOP, mode=Mode.PRIVATE)
    fillet6_piece_1 = split(fillet6_piece_1, bisect_by=Plane(origin=(11, 3.588944861, 33.172467691), z_dir=(-1, 0, 0)), keep=Keep.TOP, mode=Mode.PRIVATE)
    add(fillet6_piece_1)
    with BuildSketch(Plane(origin=(0, 3.7, 25.2), x_dir=(0, 0, 1), z_dir=(-1, 0, 0))) as fillet6_piece_2:
        with BuildLine():
            CenterArc((FILLET6_R, -FILLET6_R), FILLET6_R, 90, 90)
            Line((0, -FILLET6_R), (0, 0))
            Line((0, 0), (FILLET6_R, 0))
        make_face()
    extrude(amount=11)

    # Sketch14 → Cut-Extrude9 (cut)
    with BuildSketch(Plane.XY.offset(45)):
        with Locations((5.5, 0)):
            Rectangle(SKETCH14_W, SKETCH14_H)
    extrude(amount=-CUT_EXTRUDE9_DEPTH, mode=Mode.SUBTRACT)

    # Sketch15 → Boss-Extrude3 (add)
    with BuildSketch(Plane(origin=(-11, 0, 0), x_dir=(0, 0, -1), z_dir=(1, 0, 0))):
        with Locations((-35.23, -6.365)):
            Circle(SKETCH15_R)
    extrude(amount=BOSS_EXTRUDE3_DEPTH, taper=BOSS_EXTRUDE3_TAPER)

    # Sketch16 → Cut-Extrude10 (cut)
    with BuildSketch(Plane.ZY):
        with Locations((38, -7.1075)):
            Rectangle(SKETCH16_W, SKETCH16_H)
    extrude(amount=-CUT_EXTRUDE10_DEPTH, mode=Mode.SUBTRACT)

    # Sketch17 → Cut-Revolve2 (revolve, cut)
    with BuildSketch(Plane.XY.offset(35.23)):
        Polygon((-16.5, -6.365), (-16.5, -3.265), (-13.5, -3.265), (-13.5, -4.865), (11.5, -4.865), (11.5, -4.115), (16, -4.115), (16, -3.865), (16.5, -3.865), (16.5, -6.365), align=None)
    revolve(axis=Axis((31.947720378, -6.365, 35.23), (-1, 0, 0)), mode=Mode.SUBTRACT)

    # Sketch19 → Boss-Extrude4 (add)
    with BuildSketch(Plane.ZY.offset(-11)):
        with Locations((22.5, 6.365)):
            Circle(SKETCH19_R)
    boss_extrude4 = extrude(amount=BOSS_EXTRUDE4_DEPTH, taper=BOSS_EXTRUDE4_TAPER)

    # Mirror4: Boss-Extrude4 across plane
    add(boss_extrude4.mirror(Plane(origin=(5.5, 0, 0), x_dir=(0, 0, 1), z_dir=(1, 0, 0))))

    # Sketch20 → Cut-Revolve3 (revolve, cut)
    with BuildSketch(Plane.XY.offset(22.5), mode=Mode.PRIVATE) as cut_revolve3_sk:
        Polygon((16.5, 6.365), (16.5, 9.465), (13.5, 9.465), (13.5, 7.865), (-11.5, 7.865), (-11.5, 8.615), (-16, 8.615), (-16, 8.865), (-16.5, 8.865), (-16.5, 6.365), align=None)
    revolve(cut_revolve3_sk.sketch.rotate(Axis((11, 6.365, 22.5), (-1, 0, 0)), 90), axis=Axis((11, 6.365, 22.5), (-1, 0, 0)), mode=Mode.SUBTRACT)

    # Fillet7
    fillet7_edges = [part.edges().sort_by_distance(p)[0] for p in [
        (16.5, -13.5, 31.5),
        (12.5, -17.5, 31.5),
        (-12.5, -17.5, 31.5),
        (-16.5, -13.5, 31.5),
        (-16.5, 13.5, 22.5),
        (-12.5, 17.5, 22.5),
        (12.5, 17.5, 22.5),
        (16.5, 13.5, 22.5),
    ]]
    fillet(fillet7_edges, radius=FILLET7_R)


solid = part.part
